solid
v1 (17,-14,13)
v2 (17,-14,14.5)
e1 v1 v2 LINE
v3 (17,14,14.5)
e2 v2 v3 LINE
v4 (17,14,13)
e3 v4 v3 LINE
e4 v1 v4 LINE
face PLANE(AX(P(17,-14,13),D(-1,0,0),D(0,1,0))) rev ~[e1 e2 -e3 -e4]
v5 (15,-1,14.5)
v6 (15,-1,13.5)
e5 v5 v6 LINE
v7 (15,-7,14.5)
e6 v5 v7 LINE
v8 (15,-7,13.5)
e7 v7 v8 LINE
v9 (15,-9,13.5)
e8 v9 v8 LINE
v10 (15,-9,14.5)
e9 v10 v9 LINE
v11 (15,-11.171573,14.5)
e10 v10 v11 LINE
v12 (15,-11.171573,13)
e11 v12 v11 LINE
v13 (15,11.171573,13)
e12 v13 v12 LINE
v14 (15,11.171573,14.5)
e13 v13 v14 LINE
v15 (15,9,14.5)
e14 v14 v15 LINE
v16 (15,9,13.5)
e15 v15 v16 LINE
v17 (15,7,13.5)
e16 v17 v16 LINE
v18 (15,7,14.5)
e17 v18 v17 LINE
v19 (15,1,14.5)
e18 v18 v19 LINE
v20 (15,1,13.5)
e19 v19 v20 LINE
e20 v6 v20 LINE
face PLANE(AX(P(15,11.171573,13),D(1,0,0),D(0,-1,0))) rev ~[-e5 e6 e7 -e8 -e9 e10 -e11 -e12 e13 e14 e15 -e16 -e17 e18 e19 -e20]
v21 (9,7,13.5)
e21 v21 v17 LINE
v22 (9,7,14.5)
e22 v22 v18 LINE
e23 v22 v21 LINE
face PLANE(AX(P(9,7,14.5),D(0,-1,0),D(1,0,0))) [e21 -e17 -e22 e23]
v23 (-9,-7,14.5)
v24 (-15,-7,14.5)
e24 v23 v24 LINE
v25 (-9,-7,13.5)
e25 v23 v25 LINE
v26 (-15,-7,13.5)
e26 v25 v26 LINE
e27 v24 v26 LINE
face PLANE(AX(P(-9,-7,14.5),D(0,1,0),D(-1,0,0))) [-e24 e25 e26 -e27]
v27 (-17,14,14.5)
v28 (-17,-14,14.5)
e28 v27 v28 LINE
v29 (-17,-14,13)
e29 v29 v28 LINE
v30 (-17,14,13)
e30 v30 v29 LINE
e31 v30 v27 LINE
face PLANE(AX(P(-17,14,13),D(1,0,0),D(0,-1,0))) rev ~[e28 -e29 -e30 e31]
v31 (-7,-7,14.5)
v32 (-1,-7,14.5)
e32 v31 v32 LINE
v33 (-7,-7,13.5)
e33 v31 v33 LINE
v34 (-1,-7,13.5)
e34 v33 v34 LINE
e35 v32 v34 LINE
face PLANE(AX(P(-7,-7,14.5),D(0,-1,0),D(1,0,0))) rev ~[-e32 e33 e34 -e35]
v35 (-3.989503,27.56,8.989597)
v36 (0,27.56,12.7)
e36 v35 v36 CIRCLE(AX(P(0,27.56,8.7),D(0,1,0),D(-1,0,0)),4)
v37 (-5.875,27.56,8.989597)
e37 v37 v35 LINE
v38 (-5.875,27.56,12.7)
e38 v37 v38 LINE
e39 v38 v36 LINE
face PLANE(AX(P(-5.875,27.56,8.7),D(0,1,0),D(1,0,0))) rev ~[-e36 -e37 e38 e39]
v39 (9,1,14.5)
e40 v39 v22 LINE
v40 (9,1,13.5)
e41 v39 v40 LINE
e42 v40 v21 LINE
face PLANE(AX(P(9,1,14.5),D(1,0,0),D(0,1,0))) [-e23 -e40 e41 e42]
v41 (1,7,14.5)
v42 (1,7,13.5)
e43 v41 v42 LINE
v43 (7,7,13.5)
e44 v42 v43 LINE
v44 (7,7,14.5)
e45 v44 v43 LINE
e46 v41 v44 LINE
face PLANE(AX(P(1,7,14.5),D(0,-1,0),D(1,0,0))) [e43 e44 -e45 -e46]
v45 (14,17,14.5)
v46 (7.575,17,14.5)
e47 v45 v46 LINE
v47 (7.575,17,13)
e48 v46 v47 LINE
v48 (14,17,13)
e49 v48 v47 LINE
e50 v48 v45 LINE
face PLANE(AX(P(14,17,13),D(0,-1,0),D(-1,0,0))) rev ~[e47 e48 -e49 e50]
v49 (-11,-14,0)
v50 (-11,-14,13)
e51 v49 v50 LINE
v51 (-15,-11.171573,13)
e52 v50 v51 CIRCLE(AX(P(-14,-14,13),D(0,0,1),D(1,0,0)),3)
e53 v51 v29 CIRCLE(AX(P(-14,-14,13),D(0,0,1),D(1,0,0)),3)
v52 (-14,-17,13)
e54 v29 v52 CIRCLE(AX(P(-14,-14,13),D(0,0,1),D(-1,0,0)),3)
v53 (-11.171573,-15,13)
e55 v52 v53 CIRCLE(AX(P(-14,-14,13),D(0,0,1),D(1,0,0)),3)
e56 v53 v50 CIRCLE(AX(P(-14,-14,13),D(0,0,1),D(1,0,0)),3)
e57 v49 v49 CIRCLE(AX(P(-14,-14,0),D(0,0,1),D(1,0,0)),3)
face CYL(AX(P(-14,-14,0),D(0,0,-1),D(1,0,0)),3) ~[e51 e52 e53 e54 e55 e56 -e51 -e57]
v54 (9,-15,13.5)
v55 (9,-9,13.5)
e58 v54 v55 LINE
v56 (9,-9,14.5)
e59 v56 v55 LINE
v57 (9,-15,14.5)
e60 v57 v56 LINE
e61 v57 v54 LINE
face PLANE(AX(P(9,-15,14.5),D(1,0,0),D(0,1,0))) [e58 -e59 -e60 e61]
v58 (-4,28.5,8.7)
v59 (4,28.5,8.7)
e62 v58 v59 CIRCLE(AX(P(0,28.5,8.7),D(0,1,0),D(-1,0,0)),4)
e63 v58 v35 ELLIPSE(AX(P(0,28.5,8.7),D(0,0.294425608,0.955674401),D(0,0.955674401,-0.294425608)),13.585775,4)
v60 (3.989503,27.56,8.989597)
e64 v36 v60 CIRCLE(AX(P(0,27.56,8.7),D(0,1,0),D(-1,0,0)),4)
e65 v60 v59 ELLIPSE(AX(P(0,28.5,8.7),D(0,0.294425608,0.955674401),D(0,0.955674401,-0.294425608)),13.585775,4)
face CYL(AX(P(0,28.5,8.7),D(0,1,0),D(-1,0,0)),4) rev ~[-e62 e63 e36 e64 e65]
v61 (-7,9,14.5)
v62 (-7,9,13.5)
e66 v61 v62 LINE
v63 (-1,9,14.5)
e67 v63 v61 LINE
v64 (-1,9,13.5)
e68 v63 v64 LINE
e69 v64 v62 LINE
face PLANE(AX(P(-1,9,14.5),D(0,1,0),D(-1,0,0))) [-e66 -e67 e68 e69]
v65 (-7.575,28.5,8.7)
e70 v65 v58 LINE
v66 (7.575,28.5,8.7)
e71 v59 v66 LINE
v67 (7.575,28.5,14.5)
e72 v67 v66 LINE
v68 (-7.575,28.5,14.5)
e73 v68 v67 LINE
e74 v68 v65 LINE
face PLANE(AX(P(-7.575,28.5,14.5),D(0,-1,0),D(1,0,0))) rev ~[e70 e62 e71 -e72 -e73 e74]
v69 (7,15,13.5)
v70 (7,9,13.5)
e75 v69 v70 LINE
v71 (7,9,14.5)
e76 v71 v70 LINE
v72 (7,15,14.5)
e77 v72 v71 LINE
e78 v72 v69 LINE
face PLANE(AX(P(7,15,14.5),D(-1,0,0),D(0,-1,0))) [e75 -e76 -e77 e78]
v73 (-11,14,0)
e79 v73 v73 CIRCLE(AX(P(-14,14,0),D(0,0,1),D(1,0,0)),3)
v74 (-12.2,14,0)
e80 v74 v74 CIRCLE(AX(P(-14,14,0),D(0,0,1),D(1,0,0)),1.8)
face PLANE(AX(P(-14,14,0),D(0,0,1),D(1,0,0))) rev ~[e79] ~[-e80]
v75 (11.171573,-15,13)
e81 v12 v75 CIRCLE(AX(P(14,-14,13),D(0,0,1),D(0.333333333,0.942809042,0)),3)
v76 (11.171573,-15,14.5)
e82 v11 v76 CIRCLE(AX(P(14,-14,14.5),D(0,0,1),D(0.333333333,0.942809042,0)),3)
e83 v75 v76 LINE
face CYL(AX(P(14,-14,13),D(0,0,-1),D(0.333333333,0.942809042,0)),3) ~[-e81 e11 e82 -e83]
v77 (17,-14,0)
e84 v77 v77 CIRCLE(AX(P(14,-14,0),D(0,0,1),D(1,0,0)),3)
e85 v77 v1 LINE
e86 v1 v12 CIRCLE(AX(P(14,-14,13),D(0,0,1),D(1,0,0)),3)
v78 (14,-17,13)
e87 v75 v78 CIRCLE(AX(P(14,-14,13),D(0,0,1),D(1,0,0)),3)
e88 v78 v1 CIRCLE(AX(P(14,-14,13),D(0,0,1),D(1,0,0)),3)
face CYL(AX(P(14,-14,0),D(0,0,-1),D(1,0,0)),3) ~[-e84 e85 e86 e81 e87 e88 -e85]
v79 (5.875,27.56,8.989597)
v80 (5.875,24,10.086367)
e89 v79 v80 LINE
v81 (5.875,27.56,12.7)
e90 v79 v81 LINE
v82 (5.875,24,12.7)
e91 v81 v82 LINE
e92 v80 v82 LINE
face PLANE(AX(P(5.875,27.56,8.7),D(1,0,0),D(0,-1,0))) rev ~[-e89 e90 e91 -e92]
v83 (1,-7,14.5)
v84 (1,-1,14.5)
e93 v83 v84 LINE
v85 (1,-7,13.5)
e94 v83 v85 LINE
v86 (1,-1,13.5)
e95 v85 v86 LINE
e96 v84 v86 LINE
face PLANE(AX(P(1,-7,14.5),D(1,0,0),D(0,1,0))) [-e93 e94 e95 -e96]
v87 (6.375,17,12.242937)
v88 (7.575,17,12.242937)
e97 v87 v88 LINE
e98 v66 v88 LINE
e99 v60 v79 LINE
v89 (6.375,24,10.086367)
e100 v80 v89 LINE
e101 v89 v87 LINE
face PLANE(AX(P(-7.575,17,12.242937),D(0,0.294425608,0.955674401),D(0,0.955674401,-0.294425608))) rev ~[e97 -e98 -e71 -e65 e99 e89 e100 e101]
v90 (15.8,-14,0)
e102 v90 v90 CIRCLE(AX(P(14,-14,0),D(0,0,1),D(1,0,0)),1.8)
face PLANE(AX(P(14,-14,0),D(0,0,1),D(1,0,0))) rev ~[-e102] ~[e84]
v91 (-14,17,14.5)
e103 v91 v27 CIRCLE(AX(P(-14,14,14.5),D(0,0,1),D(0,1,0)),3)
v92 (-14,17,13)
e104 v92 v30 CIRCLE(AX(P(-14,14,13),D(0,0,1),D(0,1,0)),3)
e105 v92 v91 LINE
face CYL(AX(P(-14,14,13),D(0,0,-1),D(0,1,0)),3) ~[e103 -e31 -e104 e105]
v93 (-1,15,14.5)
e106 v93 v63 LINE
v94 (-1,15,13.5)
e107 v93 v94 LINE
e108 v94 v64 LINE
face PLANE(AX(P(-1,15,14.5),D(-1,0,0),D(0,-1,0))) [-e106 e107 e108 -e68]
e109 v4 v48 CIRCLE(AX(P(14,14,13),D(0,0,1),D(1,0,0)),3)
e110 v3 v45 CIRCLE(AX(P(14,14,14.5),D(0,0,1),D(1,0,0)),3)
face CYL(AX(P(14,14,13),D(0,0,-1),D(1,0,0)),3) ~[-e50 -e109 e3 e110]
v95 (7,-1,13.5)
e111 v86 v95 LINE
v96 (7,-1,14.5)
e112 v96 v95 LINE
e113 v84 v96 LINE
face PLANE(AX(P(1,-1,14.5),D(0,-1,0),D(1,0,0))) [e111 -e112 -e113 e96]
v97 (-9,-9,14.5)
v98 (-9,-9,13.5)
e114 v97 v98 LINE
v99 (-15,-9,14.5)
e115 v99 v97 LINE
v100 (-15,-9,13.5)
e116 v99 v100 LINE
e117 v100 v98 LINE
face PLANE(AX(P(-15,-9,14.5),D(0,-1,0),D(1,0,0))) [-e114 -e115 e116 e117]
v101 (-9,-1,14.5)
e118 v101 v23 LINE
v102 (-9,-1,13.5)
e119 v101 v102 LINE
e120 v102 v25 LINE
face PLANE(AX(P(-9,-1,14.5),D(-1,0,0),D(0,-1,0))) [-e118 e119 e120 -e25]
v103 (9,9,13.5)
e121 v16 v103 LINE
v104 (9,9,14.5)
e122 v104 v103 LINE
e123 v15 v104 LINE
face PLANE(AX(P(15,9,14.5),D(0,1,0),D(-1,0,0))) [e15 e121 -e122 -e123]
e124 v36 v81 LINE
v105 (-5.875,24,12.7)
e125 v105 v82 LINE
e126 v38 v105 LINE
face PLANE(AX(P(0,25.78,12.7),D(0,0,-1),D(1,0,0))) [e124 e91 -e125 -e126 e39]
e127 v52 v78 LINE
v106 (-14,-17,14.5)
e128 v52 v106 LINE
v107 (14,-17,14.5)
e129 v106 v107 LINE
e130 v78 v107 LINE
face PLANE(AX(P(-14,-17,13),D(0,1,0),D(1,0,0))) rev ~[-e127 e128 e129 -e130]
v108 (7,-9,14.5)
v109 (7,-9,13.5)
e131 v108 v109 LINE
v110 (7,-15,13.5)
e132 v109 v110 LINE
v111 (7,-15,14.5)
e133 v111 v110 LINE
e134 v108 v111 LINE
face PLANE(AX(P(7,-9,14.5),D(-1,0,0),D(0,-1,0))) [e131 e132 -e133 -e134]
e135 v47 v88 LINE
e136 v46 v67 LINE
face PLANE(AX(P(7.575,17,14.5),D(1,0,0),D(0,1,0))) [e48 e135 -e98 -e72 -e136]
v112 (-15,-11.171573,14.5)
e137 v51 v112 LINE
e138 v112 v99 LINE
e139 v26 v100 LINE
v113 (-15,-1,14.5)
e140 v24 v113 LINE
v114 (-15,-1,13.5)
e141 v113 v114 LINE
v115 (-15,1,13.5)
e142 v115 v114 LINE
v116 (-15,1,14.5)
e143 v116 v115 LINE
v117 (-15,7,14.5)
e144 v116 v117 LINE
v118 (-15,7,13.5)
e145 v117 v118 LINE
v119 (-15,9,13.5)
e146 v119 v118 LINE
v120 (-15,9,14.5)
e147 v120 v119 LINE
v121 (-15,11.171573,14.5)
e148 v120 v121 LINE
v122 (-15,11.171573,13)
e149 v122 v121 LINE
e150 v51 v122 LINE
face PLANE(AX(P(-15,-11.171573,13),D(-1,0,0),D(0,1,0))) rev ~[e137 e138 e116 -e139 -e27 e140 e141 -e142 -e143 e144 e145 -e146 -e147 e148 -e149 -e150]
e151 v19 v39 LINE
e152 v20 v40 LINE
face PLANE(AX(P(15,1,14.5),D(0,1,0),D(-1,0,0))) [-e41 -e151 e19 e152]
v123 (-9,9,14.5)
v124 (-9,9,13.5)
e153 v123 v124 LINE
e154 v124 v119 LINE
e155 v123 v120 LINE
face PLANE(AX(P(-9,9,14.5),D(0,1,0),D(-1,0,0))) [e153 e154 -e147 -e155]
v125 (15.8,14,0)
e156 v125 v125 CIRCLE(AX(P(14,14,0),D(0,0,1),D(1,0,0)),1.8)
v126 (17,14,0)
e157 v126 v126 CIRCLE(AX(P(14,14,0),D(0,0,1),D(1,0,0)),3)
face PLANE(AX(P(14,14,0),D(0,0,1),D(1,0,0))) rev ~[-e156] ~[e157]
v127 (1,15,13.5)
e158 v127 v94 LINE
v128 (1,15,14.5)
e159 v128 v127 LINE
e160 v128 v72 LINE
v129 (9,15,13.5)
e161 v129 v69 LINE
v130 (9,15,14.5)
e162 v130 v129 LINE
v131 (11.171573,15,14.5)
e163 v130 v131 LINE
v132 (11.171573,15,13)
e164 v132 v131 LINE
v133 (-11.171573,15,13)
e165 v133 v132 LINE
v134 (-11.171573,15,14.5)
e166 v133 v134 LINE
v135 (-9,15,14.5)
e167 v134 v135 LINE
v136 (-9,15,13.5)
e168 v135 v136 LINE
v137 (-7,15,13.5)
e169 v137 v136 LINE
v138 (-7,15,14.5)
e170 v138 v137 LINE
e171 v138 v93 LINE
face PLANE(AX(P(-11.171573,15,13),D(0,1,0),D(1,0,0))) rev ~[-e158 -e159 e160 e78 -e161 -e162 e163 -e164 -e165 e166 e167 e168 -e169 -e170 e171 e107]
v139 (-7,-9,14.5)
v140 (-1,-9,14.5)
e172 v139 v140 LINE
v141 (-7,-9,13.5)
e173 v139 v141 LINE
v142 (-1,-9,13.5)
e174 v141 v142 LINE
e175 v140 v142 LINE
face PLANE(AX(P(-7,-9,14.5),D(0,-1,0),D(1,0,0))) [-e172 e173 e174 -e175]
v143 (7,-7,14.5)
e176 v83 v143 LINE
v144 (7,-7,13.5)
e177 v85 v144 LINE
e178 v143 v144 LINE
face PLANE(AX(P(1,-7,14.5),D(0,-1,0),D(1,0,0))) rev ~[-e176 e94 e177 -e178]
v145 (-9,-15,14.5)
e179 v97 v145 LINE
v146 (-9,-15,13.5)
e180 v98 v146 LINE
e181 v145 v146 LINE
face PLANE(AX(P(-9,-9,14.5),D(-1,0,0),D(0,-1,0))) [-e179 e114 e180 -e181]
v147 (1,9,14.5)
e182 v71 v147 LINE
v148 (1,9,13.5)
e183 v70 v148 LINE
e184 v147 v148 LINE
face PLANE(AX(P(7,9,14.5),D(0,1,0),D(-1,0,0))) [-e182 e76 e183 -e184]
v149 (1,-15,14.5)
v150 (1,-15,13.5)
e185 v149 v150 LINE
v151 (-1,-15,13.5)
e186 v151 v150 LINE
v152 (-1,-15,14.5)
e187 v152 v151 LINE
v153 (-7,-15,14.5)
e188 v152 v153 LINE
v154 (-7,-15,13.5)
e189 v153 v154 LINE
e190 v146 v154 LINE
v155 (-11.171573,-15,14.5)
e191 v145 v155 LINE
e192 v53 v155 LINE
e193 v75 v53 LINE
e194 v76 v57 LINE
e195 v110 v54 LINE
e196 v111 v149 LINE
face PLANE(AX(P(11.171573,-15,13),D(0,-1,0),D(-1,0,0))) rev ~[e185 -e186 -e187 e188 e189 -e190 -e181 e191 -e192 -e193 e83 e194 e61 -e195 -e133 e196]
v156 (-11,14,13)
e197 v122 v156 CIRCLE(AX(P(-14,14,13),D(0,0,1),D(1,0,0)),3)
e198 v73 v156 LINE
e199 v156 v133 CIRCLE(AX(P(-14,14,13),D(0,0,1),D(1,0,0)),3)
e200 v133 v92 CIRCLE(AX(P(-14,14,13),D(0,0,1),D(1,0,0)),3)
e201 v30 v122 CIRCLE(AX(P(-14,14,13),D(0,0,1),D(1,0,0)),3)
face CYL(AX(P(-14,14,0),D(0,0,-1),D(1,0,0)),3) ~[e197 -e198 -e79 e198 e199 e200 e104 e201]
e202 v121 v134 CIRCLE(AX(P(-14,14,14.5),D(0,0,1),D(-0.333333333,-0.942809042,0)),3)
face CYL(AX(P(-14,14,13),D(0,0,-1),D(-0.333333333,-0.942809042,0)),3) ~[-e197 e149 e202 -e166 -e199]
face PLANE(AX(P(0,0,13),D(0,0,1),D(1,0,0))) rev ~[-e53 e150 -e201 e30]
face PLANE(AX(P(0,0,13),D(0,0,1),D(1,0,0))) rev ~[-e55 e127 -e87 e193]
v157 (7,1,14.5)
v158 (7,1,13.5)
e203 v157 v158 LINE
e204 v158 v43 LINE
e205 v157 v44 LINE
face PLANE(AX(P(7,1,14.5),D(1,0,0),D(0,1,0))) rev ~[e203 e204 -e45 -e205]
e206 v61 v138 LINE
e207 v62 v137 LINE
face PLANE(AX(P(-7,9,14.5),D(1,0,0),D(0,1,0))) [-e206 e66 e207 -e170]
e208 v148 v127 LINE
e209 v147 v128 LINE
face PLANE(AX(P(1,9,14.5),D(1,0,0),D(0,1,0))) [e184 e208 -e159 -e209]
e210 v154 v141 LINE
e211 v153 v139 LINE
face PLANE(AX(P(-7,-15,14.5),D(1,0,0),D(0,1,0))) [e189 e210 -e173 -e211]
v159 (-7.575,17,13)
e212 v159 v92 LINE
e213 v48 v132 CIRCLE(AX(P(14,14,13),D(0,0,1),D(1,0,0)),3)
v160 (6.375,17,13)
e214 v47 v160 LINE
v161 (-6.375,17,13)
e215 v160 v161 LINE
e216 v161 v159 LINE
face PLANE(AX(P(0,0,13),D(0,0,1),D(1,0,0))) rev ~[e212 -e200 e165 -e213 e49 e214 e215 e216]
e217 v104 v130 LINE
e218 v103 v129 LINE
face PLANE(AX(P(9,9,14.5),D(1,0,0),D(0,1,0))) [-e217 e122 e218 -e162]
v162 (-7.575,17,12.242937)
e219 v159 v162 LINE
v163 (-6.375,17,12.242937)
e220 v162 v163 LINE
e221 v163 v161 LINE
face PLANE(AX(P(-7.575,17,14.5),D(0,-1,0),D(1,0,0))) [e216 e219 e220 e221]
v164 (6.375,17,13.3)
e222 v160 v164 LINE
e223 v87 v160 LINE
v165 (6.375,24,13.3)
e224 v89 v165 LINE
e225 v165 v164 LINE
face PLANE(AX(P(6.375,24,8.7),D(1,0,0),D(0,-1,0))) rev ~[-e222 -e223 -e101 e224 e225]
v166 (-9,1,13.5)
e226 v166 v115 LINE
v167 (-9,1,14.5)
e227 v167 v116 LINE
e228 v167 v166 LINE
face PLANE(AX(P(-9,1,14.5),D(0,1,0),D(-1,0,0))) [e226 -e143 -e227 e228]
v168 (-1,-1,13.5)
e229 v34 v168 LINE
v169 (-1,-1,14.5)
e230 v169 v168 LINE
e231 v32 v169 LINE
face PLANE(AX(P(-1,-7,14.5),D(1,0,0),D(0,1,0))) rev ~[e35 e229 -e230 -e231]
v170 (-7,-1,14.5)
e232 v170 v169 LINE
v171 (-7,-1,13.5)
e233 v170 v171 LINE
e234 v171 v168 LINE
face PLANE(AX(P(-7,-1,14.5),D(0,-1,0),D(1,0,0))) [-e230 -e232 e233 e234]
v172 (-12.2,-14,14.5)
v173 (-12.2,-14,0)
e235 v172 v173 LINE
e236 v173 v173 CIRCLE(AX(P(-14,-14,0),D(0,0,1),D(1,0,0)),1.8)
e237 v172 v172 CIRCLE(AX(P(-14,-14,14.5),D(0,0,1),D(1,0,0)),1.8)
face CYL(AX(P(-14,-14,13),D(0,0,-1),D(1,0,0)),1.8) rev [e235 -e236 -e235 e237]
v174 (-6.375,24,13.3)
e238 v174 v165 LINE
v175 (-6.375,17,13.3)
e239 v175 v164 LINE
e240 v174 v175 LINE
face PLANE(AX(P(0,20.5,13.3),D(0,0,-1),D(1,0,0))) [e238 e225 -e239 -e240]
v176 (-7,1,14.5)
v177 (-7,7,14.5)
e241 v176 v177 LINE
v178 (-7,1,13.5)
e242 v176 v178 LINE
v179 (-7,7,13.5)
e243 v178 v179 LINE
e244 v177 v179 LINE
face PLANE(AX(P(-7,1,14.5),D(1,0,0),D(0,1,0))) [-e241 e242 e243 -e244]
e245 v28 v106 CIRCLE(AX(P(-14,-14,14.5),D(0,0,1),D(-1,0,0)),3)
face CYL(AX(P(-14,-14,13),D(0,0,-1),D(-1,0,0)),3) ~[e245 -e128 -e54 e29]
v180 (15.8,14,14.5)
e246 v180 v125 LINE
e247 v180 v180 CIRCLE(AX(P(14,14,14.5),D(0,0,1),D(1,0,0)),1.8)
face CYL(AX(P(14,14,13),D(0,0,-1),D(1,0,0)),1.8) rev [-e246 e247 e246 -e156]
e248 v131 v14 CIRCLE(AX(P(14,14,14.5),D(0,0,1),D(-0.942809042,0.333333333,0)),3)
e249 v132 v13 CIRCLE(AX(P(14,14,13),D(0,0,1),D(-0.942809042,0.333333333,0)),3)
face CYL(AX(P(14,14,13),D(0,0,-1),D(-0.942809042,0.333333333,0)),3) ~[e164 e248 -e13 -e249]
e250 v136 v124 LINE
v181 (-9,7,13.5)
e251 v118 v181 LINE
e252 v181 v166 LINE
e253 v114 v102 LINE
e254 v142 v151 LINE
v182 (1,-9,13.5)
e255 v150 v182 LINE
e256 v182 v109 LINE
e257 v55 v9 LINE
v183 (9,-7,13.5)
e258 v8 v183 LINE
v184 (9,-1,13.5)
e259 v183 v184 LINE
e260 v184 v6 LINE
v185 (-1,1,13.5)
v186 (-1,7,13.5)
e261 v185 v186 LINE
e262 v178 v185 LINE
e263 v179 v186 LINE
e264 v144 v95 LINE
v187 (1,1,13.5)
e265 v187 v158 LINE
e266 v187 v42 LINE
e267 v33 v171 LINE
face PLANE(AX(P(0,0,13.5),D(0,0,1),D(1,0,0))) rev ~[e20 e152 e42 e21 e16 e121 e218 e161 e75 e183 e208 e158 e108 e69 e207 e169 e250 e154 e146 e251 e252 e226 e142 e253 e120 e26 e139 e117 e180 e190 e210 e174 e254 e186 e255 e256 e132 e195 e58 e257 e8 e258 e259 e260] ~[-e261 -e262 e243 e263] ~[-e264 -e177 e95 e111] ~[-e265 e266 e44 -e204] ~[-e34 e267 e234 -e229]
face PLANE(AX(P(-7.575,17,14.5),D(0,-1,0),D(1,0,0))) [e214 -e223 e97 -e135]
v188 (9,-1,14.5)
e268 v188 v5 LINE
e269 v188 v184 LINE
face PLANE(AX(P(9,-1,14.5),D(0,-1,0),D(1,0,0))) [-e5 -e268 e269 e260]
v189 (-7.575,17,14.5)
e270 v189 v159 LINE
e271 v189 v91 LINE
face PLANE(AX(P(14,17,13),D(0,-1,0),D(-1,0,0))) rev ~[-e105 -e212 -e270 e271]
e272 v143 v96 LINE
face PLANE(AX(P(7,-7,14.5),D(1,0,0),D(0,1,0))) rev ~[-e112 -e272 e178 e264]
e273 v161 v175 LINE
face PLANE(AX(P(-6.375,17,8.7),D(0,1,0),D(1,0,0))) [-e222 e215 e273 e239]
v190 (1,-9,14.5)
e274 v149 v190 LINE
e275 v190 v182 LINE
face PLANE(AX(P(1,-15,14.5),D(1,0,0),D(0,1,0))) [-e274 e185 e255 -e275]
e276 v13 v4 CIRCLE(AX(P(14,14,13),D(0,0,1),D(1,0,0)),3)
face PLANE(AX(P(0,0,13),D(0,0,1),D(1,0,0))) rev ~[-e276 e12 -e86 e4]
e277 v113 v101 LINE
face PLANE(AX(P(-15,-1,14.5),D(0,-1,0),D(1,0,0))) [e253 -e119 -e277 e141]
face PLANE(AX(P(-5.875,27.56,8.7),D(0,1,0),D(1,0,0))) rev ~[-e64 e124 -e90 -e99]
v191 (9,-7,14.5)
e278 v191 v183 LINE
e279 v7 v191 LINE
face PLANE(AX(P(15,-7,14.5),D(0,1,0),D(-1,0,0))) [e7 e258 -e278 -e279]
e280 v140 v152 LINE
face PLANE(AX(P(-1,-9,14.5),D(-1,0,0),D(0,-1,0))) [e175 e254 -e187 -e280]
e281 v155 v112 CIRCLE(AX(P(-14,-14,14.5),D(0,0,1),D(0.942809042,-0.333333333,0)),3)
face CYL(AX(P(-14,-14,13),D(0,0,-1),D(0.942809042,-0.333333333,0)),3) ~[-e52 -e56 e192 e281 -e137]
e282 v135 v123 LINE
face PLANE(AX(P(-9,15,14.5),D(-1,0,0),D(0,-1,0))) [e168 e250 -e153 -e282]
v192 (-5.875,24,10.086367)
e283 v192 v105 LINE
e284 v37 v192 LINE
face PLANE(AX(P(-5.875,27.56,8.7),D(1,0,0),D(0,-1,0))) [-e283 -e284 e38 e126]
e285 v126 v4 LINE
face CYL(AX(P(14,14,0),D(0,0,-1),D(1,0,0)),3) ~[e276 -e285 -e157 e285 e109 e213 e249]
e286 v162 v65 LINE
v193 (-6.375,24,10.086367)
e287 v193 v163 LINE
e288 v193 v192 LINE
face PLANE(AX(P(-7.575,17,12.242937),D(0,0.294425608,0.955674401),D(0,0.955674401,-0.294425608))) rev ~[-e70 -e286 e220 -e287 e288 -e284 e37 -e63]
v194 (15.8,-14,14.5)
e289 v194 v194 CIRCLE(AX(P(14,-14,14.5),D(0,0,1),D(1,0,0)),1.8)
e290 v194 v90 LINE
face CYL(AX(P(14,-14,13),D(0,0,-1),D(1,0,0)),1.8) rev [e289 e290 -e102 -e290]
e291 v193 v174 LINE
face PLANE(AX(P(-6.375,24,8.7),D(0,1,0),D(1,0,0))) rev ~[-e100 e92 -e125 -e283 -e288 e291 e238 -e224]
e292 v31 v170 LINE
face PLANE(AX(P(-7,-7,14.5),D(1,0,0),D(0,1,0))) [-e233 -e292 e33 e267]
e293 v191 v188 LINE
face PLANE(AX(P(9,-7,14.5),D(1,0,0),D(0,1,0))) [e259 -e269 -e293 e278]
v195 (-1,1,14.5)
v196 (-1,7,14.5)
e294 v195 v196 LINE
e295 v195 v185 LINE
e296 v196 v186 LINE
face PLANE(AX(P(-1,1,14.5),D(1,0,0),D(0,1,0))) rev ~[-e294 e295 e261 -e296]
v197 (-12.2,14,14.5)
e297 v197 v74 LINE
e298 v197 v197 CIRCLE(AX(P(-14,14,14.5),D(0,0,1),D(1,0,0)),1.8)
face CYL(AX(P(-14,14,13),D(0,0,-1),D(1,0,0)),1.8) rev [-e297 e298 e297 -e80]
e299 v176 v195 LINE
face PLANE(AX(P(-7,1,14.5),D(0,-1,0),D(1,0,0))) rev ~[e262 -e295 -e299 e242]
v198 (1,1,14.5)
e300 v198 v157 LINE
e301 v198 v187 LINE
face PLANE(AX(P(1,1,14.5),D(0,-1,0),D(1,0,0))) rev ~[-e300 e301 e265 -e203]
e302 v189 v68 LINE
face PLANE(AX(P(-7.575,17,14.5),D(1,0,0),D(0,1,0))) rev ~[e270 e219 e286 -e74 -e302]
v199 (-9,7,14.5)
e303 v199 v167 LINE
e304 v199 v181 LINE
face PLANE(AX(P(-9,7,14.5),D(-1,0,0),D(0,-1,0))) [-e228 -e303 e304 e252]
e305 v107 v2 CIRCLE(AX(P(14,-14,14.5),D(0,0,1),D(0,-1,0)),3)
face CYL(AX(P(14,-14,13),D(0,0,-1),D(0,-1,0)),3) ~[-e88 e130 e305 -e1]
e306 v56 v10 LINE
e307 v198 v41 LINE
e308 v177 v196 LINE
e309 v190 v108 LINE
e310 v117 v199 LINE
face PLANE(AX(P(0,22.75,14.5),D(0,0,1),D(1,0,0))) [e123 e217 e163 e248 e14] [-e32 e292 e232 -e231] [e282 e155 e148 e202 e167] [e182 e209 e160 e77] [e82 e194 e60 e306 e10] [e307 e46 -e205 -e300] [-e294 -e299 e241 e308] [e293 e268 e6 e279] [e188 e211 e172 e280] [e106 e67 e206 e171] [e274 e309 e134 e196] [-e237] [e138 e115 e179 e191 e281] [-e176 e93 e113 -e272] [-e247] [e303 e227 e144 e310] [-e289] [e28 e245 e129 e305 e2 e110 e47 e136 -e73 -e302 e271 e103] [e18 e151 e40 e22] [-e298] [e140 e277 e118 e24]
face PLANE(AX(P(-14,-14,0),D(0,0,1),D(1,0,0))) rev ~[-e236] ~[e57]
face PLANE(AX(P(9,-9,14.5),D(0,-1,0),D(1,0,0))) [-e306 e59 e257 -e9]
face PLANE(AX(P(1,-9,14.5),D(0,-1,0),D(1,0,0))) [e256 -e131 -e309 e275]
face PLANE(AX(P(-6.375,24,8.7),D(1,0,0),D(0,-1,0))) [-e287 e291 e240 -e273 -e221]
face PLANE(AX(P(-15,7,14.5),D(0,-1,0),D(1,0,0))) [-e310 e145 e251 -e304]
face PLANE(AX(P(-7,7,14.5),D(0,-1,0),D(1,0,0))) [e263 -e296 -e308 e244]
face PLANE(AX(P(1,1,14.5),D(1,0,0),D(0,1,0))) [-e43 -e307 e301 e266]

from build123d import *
from build123d import SkipClean  # not in build123d's __all__

# Parameters (mm, degrees)
F0_R      = 3
F0_R_2    = 1.8
F1_DEPTH  = 13
F2_R      = 1.8
F3_DEPTH  = 1.5
F4_W      = 6
F4_H      = 6
F5_DEPTH  = 1
F6_W      = 15.15
F6_H      = 11.5
F7_DEPTH  = 5.8
F8_W      = 12.75
F8_H      = 7
F9_DEPTH  = 4.6
F10_W     = 11.75
F10_H     = 3.56
F11_DEPTH = 4
F13_DEPTH = 2
F15_DEPTH = 25


with BuildPart() as f1:
    # F0 (on Top) → F1 (new body)
    with BuildSketch(Plane.XY):
        with Locations((-14, 14)):
            Circle(F0_R)
        with Locations((-14, 14)):
            Circle(F0_R_2, mode=Mode.SUBTRACT)
    extrude(amount=F1_DEPTH)



with BuildPart() as f1b:
    # F0 (on Top) → F1, piece 2 (new body)
    with BuildSketch(Plane.XY):
        with Locations((-14, -14)):
            Circle(F0_R)
        with Locations((-14, -14)):
            Circle(F0_R_2, mode=Mode.SUBTRACT)
    extrude(amount=F1_DEPTH)


with BuildPart() as f1c:
    # F0 (on Top) → F1, piece 3 (new body)
    with BuildSketch(Plane.XY):
        with Locations((14, -14)):
            Circle(F0_R)
        with Locations((14, -14)):
            Circle(F0_R_2, mode=Mode.SUBTRACT)
    extrude(amount=F1_DEPTH)


with BuildPart() as f1d:
    # F0 (on Top) → F1, piece 4 (new body)
    with BuildSketch(Plane.XY):
        with Locations((14, 14)):
            Circle(F0_R)
        with Locations((14, 14)):
            Circle(F0_R_2, mode=Mode.SUBTRACT)
    extrude(amount=F1_DEPTH)


with BuildPart() as f1_1:
    add(f1.part, clean=False)

    with SkipClean():  # cleaning this boolean's faces spoils the solid; the shape is the same uncleaned
        add(f1b.part)  # F3 merges F1b

    with SkipClean():  # cleaning this boolean's faces spoils the solid; the shape is the same uncleaned
        add(f1c.part)  # F3 merges F1c

    with SkipClean():  # cleaning this boolean's faces spoils the solid; the shape is the same uncleaned
        add(f1d.part)  # F3 merges F1d
    # F2 (on face) → F3 (join)
    with BuildSketch(Plane.XY.offset(13)):
        with BuildLine():
            Line((14, 17), (-14, 17))
            ThreePointArc((-14, 17), (-16.1213203436, 16.1213203436), (-17, 14))
            Line((-17, 14), (-17, -14))
            ThreePointArc((-17, -14), (-16.1213203436, -16.1213203436), (-14, -17))
            Line((-14, -17), (14, -17))
            ThreePointArc((14, -17), (16.1213203436, -16.1213203436), (17, -14))
            Line((17, -14), (17, 14))
            ThreePointArc((17, 14), (16.1213203436, 16.1213203436), (14, 17))
        make_face()
        with Locations((-14, -14)):
            Circle(F2_R, mode=Mode.SUBTRACT)
        with Locations((14, -14)):
            Circle(F2_R, mode=Mode.SUBTRACT)
        with Locations((-14, 14)):
            Circle(F2_R, mode=Mode.SUBTRACT)
        with BuildLine():
            Line((-15, -11.1715728753), (-15, 11.1715728753))
            ThreePointArc((-15, 11.1715728753), (-11.8786796564, 11.8786796564), (-11.1715728753, 15))
            Line((-11.1715728753, 15), (11.1715728753, 15))
            ThreePointArc((11.1715728753, 15), (11.8786796564, 11.8786796564), (15, 11.1715728753))
            Line((15, 11.1715728753), (15, -11.1715728753))
            ThreePointArc((15, -11.1715728753), (11.8786796564, -11.8786796564), (11.1715728753, -15))
            Line((11.1715728753, -15), (-11.1715728753, -15))
            ThreePointArc((-11.1715728753, -15), (-11.8786796564, -11.8786796564), (-15, -11.1715728753))
        make_face(mode=Mode.SUBTRACT)
        with Locations((14, 14)):
            Circle(F2_R, mode=Mode.SUBTRACT)
    with SkipClean():  # cleaning this boolean's faces spoils the solid; the shape is the same uncleaned
        extrude(amount=F3_DEPTH)

    # F4 (on face) → F5 (join)
    with BuildSketch(Plane.XY.offset(14.5)):
        Polygon((1, 15), (-1, 15), (-1, 9), (-7, 9), (-7, 15), (-9, 15), (-9, 9), (-15, 9), (-15, 7), (-9, 7), (-9, 1), (-15, 1), (-15, -1), (-9, -1), (-9, -7), (-15, -7), (-15, -9), (-9, -9), (-9, -15), (-7, -15), (-7, -9), (-1, -9), (-1, -15), (1, -15), (1, -9), (7, -9), (7, -15), (9, -15), (9, -9), (15, -9), (15, -7), (9, -7), (9, -1), (15, -1), (15, 1), (9, 1), (9, 7), (15, 7), (15, 9), (9, 9), (9, 15), (7, 15), (7, 9), (1, 9), align=None)
        with Locations((-4, -4)):
            Rectangle(F4_W, F4_H, mode=Mode.SUBTRACT)
        with Locations((4, -4)):
            Rectangle(F4_W, F4_H, mode=Mode.SUBTRACT)
        with Locations((-4, 4)):
            Rectangle(F4_W, F4_H, mode=Mode.SUBTRACT)
        with Locations((4, 4)):
            Rectangle(F4_W, F4_H, mode=Mode.SUBTRACT)
    extrude(amount=-F5_DEPTH)

    # F6 (on face) → F7 (join)
    with BuildSketch(Plane.XY.offset(14.5)):
        with Locations((0, 22.75)):
            Rectangle(F6_W, F6_H)
    with SkipClean():  # cleaning this boolean's faces spoils the solid; the shape is the same uncleaned
        extrude(amount=-F7_DEPTH)

    # F8 (on face) → F9 (cut)
    with BuildSketch(Plane(origin=(0, 0, 8.7), x_dir=(1, 0, 0), z_dir=(0, 0, -1))):
        with Locations((0, -20.5)):
            Rectangle(F8_W, F8_H)
    with SkipClean():  # cleaning this boolean's faces spoils the solid; the shape is the same uncleaned
        extrude(amount=-F9_DEPTH, mode=Mode.SUBTRACT)

    # F10 (on face) → F11 (cut)
    with BuildSketch(Plane(origin=(0, 0, 8.7), x_dir=(1, 0, 0), z_dir=(0, 0, -1))):
        with Locations((0, -25.78)):
            Rectangle(F10_W, F10_H)
    with SkipClean():  # cleaning this boolean's faces spoils the solid; the shape is the same uncleaned
        extrude(amount=-F11_DEPTH, mode=Mode.SUBTRACT)

    # F12 (on face) → F13 (cut, symmetric)
    with BuildSketch(Plane(origin=(0, 28.5, 0), x_dir=(-1, 0, 0), z_dir=(0, 1, 0))):
        with BuildLine():
            Line((-4, 8.7), (4, 8.7))
            ThreePointArc((4, 8.7), (0, 12.7), (-4, 8.7))
        make_face()
    with SkipClean():  # cleaning this boolean's faces spoils the solid; the shape is the same uncleaned
        extrude(amount=F13_DEPTH, both=True, mode=Mode.SUBTRACT)

    # F14 (on face) → F15 (cut)
    with BuildSketch(Plane(origin=(-7.575, 0, 0), x_dir=(0, -1, 0), z_dir=(-1, 0, 0))):
        Polygon((-17, 12.2429373081), (-28.5, 8.7), (-17, 8.7), align=None)
    extrude(amount=-F15_DEPTH, mode=Mode.SUBTRACT)


solid = f1_1.part
